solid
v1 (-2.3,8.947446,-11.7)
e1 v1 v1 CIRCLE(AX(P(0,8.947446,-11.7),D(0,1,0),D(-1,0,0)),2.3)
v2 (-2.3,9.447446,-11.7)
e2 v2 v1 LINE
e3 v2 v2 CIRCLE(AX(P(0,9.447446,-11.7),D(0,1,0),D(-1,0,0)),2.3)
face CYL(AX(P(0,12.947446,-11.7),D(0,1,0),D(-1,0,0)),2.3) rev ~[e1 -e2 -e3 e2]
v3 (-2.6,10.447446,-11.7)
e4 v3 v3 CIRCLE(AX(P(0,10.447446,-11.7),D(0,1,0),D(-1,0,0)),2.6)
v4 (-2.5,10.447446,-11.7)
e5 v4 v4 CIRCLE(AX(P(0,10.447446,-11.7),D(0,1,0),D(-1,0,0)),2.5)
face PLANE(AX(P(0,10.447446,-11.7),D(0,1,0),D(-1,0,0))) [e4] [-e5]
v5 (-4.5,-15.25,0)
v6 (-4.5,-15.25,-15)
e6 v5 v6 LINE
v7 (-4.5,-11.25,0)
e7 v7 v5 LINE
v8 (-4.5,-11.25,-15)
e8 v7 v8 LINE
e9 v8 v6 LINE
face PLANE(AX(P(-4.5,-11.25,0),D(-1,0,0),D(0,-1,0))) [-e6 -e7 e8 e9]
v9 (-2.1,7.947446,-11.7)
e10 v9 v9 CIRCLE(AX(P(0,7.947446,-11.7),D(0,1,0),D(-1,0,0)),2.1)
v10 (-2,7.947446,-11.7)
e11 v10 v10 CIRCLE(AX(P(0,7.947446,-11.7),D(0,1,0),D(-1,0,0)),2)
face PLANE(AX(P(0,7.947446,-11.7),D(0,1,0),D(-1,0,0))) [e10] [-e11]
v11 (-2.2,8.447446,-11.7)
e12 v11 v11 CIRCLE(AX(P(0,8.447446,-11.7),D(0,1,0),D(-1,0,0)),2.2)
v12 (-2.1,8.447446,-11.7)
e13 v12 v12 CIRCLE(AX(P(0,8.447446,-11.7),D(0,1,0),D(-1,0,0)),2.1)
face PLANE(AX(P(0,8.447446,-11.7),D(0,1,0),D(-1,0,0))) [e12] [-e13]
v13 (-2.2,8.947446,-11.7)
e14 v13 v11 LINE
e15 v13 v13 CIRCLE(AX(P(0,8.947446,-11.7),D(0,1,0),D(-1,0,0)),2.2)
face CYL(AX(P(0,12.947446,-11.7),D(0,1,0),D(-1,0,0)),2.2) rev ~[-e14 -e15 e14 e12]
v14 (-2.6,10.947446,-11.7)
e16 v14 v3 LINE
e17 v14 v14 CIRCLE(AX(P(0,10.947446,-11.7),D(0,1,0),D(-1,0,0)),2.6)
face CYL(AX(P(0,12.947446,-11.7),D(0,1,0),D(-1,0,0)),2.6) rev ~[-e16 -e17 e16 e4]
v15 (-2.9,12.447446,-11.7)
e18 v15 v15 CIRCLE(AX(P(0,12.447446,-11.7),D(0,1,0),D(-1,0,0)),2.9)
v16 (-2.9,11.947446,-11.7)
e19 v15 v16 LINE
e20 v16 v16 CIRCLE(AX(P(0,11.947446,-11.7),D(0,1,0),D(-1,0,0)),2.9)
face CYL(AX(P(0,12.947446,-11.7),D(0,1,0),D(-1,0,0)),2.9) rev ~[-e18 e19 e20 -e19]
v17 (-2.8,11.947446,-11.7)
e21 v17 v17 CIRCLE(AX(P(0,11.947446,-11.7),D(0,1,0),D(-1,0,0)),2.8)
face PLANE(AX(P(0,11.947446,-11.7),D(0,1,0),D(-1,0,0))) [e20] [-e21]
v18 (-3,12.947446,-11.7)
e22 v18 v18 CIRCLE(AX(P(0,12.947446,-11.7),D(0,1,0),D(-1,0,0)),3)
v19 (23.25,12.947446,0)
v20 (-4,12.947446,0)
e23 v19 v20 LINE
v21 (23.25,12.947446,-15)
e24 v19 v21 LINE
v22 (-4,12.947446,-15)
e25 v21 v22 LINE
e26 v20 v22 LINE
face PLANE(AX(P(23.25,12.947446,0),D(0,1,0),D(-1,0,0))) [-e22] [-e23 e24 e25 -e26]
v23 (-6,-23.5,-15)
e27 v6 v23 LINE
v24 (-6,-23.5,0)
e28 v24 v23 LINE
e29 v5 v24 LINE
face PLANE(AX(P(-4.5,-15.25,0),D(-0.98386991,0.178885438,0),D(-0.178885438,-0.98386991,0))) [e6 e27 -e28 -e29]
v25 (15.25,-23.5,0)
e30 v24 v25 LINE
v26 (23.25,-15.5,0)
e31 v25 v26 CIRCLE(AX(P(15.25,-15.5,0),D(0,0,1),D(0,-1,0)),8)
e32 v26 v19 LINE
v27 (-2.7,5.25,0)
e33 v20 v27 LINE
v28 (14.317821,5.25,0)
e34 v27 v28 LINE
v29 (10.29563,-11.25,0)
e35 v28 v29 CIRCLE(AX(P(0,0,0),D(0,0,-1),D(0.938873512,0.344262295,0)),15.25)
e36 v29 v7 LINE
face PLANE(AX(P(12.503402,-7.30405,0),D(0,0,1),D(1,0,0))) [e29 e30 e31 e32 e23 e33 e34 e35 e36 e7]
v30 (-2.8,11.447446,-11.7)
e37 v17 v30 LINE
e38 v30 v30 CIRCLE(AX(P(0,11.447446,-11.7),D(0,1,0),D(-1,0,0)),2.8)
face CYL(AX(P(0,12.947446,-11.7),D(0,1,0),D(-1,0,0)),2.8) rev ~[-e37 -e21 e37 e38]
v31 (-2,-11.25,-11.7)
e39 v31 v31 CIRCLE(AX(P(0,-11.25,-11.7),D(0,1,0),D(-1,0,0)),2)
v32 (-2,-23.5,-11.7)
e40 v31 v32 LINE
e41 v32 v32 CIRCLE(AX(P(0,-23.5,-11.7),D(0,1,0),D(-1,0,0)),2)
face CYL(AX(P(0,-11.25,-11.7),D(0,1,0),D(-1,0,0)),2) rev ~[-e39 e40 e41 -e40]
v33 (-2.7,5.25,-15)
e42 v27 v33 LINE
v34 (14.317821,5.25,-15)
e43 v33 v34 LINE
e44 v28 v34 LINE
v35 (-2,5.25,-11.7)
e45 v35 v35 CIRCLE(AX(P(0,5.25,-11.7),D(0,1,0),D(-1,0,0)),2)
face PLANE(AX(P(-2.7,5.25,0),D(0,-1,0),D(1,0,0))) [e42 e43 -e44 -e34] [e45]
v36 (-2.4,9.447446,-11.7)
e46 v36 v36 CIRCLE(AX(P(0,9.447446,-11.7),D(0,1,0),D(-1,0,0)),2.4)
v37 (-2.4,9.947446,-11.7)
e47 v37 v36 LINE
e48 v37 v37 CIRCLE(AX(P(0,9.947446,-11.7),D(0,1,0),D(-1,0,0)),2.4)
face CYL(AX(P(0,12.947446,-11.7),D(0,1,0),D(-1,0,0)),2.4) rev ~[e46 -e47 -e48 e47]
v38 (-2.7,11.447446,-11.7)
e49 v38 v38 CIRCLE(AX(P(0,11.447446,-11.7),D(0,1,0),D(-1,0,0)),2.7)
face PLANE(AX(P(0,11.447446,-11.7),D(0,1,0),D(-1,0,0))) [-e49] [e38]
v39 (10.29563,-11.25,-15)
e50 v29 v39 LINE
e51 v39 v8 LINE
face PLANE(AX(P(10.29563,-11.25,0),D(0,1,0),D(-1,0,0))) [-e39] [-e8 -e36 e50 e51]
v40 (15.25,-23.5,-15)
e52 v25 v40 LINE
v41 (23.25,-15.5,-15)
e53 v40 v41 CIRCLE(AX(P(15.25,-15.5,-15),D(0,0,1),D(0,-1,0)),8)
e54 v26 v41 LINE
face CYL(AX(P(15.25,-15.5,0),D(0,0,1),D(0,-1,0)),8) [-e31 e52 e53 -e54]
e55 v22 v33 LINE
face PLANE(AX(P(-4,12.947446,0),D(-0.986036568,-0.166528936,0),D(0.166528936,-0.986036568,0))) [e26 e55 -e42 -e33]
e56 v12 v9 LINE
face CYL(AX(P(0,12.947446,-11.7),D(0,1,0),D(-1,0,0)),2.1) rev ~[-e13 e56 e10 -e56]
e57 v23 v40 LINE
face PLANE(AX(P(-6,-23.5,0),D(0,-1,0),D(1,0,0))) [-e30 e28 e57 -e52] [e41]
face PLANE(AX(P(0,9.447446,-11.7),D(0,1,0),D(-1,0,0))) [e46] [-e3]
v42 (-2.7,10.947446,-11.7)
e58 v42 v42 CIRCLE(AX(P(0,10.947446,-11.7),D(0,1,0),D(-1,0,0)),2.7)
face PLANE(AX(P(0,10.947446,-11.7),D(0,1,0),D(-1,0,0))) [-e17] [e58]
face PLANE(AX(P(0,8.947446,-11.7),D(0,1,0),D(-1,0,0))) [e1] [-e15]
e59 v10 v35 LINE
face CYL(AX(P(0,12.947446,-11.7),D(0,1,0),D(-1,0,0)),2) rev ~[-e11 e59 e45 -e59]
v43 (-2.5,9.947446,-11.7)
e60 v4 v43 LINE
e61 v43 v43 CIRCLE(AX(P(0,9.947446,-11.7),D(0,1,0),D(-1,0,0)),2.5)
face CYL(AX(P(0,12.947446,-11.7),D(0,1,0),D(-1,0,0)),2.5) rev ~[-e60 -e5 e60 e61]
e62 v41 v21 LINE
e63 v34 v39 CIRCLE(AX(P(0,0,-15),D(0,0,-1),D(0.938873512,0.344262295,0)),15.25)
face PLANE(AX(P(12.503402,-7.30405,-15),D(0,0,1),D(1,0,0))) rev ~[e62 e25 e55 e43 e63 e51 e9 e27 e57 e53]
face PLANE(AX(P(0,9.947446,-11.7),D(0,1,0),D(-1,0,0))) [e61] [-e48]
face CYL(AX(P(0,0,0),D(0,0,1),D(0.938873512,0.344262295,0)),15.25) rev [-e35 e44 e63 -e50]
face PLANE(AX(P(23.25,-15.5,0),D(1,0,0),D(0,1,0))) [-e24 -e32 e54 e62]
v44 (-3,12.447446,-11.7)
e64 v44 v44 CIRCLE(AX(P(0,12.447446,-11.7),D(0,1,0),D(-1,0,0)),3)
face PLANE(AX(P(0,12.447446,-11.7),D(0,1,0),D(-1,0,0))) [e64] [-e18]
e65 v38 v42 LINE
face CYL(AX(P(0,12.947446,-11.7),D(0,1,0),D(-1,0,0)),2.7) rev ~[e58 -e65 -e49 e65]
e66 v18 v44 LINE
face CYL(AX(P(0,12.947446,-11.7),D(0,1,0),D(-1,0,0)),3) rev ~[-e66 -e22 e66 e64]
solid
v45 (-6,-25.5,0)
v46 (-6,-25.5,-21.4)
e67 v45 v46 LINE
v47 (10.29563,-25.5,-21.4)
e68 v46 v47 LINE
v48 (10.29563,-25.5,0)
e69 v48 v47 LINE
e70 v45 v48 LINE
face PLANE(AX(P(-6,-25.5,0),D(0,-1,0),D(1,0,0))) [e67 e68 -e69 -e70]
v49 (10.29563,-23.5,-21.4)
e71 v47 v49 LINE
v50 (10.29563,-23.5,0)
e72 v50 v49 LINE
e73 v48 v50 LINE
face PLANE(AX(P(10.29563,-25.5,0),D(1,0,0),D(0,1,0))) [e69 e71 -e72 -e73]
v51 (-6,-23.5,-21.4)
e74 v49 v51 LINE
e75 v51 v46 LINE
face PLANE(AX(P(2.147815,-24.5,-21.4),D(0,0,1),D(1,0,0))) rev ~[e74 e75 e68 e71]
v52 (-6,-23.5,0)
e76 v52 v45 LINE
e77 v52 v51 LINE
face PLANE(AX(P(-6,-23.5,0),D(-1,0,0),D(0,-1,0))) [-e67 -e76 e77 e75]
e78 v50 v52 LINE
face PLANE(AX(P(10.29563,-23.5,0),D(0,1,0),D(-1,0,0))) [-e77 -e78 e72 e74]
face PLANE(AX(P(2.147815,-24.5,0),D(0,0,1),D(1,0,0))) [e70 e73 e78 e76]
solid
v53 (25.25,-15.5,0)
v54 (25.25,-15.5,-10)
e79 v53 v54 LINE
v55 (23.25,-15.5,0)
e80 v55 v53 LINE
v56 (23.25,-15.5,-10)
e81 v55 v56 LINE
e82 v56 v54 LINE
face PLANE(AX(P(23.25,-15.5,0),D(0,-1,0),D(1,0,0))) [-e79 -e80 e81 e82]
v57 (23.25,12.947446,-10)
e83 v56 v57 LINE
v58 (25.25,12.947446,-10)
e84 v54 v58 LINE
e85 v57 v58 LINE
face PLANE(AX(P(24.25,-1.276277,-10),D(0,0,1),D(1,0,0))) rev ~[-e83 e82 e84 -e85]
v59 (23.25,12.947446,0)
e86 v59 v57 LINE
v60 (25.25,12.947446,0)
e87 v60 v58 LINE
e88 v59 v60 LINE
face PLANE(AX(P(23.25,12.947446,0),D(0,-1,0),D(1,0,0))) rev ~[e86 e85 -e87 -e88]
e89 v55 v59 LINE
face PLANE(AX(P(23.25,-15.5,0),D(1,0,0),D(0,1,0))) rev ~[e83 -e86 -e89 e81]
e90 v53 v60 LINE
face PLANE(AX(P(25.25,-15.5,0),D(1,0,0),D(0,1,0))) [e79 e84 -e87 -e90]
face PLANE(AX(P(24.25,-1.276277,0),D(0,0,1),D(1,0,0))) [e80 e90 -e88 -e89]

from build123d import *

# Parameters (mm, degrees)
F0_W      = 2
F0_H      = 28.4474462867
F1_DEPTH  = 10
F2_DEPTH  = 21.4
F3_DEPTH  = 15
F4_R      = 2
F5_DEPTH  = 8
F4_R_2    = 2.1
F6_DEPTH  = 5
F4_R_3    = 2.2
F7_DEPTH  = 4.5
F4_R_4    = 2.3
F8_DEPTH  = 4
F4_R_5    = 2.4
F9_DEPTH  = 3.5
F4_R_6    = 2.5
F10_DEPTH = 3
F4_R_7    = 2.6
F11_DEPTH = 2.5
F4_R_8    = 2.7
F12_DEPTH = 2
F4_R_9    = 2.8
F13_DEPTH = 1.5
F4_R_10   = 2.9
F14_DEPTH = 1
F4_R_11   = 3
F15_DEPTH = 0.5
F16_R     = 2
F17_DEPTH = 15


with BuildPart() as f1:
    # F0 (on Top) → F1 (new body)
    with BuildSketch(Plane.XY):
        with Locations((24.25, -1.2762768567)):
            Rectangle(F0_W, F0_H)
    extrude(amount=-F1_DEPTH)


with BuildPart() as f2:
    # F0 (on Top) → F2 (new body)
    with BuildSketch(Plane.XY):
        Polygon((0, -23.5), (-6, -23.5), (-6, -25.5), (10.295630141, -25.5), (10.295630141, -23.5), align=None)
    extrude(amount=-F2_DEPTH)


with BuildPart() as f3:
    # F0 (on Top) → F3 (new body)
    with BuildSketch(Plane.XY):
        with BuildLine():
            ThreePointArc((10.295630141, -11.25), (5.5226805086, -14.2148689758), (0, -15.25))
            Line((0, -15.25), (-4.5, -15.25))
            Line((-4.5, -15.25), (-6, -23.5))
            Line((-6, -23.5), (0, -23.5))
            Line((0, -23.5), (10.295630141, -23.5))
            Line((10.295630141, -23.5), (15.25, -23.5))
            ThreePointArc((15.25, -23.5), (20.9068542495, -21.1568542495), (23.25, -15.5))
            Line((23.25, -15.5), (23.25, 12.9474462867))
            Line((23.25, 12.9474462867), (8.0576755118, 12.9474462867))
            ThreePointArc((8.0576755118, 12.9474462867), (11.8312459859, 9.6220641455), (14.3178210633, 5.25))
            ThreePointArc((14.3178210633, 5.25), (14.816139681, -3.611717729), (10.295630141, -11.25))
        make_face()
        with BuildLine():
            Line((-4.5, -15.25), (0, -15.25))
            ThreePointArc((0, -15.25), (5.5226805086, -14.2148689758), (10.295630141, -11.25))
            Line((10.295630141, -11.25), (0, -11.25))
            Line((0, -11.25), (-4.5, -13.75))
            Line((-4.5, -13.75), (-4.5, -15.25))
        make_face()
        with BuildLine():
            Line((2.7, 5.25), (14.3178210633, 5.25))
            ThreePointArc((14.3178210633, 5.25), (11.8312459859, 9.6220641455), (8.0576755118, 12.9474462867))
            Line((8.0576755118, 12.9474462867), (4, 12.9474462867))
            Line((4, 12.9474462867), (2.7, 5.25))
        make_face()
        Polygon((-2.7, 5.25), (2.7, 5.25), (4, 12.9474462867), (-4, 12.9474462867), align=None)
        Polygon((-4.5, -13.75), (0, -11.25), (-4.5, -11.25), align=None)
    extrude(amount=-F3_DEPTH)

    # F4 (on face) → F5 (cut)
    with BuildSketch(Plane(origin=(0, 12.9474462867, 0), x_dir=(-1, 0, 0), z_dir=(0, 1, 0))):
        with Locations((0, -11.7)):
            Circle(F4_R)
    extrude(amount=-F5_DEPTH, mode=Mode.SUBTRACT)

    # F4 (on face) → F6 (cut)
    with BuildSketch(Plane(origin=(0, 12.9474462867, 0), x_dir=(-1, 0, 0), z_dir=(0, 1, 0))):
        with Locations((0, -11.7)):
            Circle(F4_R_2)
        with Locations((0, -11.7)):
            Circle(F4_R, mode=Mode.SUBTRACT)
    extrude(amount=-F6_DEPTH, mode=Mode.SUBTRACT)

    # F4 (on face) → F7 (cut)
    with BuildSketch(Plane(origin=(0, 12.9474462867, 0), x_dir=(-1, 0, 0), z_dir=(0, 1, 0))):
        with Locations((0, -11.7)):
            Circle(F4_R_3)
        with Locations((0, -11.7)):
            Circle(F4_R_2, mode=Mode.SUBTRACT)
    extrude(amount=-F7_DEPTH, mode=Mode.SUBTRACT)

    # F4 (on face) → F8 (cut)
    with BuildSketch(Plane(origin=(0, 12.9474462867, 0), x_dir=(-1, 0, 0), z_dir=(0, 1, 0))):
        with Locations((0, -11.7)):
            Circle(F4_R_4)
        with Locations((0, -11.7)):
            Circle(F4_R_3, mode=Mode.SUBTRACT)
    extrude(amount=-F8_DEPTH, mode=Mode.SUBTRACT)

    # F4 (on face) → F9 (cut)
    with BuildSketch(Plane(origin=(0, 12.9474462867, 0), x_dir=(-1, 0, 0), z_dir=(0, 1, 0))):
        with Locations((0, -11.7)):
            Circle(F4_R_5)
        with Locations((0, -11.7)):
            Circle(F4_R_4, mode=Mode.SUBTRACT)
    extrude(amount=-F9_DEPTH, mode=Mode.SUBTRACT)

    # F4 (on face) → F10 (cut)
    with BuildSketch(Plane(origin=(0, 12.9474462867, 0), x_dir=(-1, 0, 0), z_dir=(0, 1, 0))):
        with Locations((0, -11.7)):
            Circle(F4_R_6)
        with Locations((0, -11.7)):
            Circle(F4_R_5, mode=Mode.SUBTRACT)
    extrude(amount=-F10_DEPTH, mode=Mode.SUBTRACT)

    # F4 (on face) → F11 (cut)
    with BuildSketch(Plane(origin=(0, 12.9474462867, 0), x_dir=(-1, 0, 0), z_dir=(0, 1, 0))):
        with Locations((0, -11.7)):
            Circle(F4_R_7)
        with Locations((0, -11.7)):
            Circle(F4_R_6, mode=Mode.SUBTRACT)
    extrude(amount=-F11_DEPTH, mode=Mode.SUBTRACT)

    # F4 (on face) → F12 (cut)
    with BuildSketch(Plane(origin=(0, 12.9474462867, 0), x_dir=(-1, 0, 0), z_dir=(0, 1, 0))):
        with Locations((0, -11.7)):
            Circle(F4_R_8)
        with Locations((0, -11.7)):
            Circle(F4_R_7, mode=Mode.SUBTRACT)
    extrude(amount=-F12_DEPTH, mode=Mode.SUBTRACT)

    # F4 (on face) → F13 (cut)
    with BuildSketch(Plane(origin=(0, 12.9474462867, 0), x_dir=(-1, 0, 0), z_dir=(0, 1, 0))):
        with Locations((0, -11.7)):
            Circle(F4_R_9)
        with Locations((0, -11.7)):
            Circle(F4_R_8, mode=Mode.SUBTRACT)
    extrude(amount=-F13_DEPTH, mode=Mode.SUBTRACT)

    # F4 (on face) → F14 (cut)
    with BuildSketch(Plane(origin=(0, 12.9474462867, 0), x_dir=(-1, 0, 0), z_dir=(0, 1, 0))):
        with Locations((0, -11.7)):
            Circle(F4_R_10)
        with Locations((0, -11.7)):
            Circle(F4_R_9, mode=Mode.SUBTRACT)
    extrude(amount=-F14_DEPTH, mode=Mode.SUBTRACT)

    # F4 (on face) → F15 (cut)
    with BuildSketch(Plane(origin=(0, 12.9474462867, 0), x_dir=(-1, 0, 0), z_dir=(0, 1, 0))):
        with Locations((0, -11.7)):
            Circle(F4_R_11)
        with Locations((0, -11.7)):
            Circle(F4_R_10, mode=Mode.SUBTRACT)
    extrude(amount=-F15_DEPTH, mode=Mode.SUBTRACT)

    # F16 (on face) → F17 (cut)
    with BuildSketch(Plane(origin=(0, -11.25, 0), x_dir=(-1, 0, 0), z_dir=(0, 1, 0))):
        with Locations((0, -11.7)):
            Circle(F16_R)
    extrude(amount=-F17_DEPTH, mode=Mode.SUBTRACT)


solid = Compound([f1.part, f2.part, f3.part])
